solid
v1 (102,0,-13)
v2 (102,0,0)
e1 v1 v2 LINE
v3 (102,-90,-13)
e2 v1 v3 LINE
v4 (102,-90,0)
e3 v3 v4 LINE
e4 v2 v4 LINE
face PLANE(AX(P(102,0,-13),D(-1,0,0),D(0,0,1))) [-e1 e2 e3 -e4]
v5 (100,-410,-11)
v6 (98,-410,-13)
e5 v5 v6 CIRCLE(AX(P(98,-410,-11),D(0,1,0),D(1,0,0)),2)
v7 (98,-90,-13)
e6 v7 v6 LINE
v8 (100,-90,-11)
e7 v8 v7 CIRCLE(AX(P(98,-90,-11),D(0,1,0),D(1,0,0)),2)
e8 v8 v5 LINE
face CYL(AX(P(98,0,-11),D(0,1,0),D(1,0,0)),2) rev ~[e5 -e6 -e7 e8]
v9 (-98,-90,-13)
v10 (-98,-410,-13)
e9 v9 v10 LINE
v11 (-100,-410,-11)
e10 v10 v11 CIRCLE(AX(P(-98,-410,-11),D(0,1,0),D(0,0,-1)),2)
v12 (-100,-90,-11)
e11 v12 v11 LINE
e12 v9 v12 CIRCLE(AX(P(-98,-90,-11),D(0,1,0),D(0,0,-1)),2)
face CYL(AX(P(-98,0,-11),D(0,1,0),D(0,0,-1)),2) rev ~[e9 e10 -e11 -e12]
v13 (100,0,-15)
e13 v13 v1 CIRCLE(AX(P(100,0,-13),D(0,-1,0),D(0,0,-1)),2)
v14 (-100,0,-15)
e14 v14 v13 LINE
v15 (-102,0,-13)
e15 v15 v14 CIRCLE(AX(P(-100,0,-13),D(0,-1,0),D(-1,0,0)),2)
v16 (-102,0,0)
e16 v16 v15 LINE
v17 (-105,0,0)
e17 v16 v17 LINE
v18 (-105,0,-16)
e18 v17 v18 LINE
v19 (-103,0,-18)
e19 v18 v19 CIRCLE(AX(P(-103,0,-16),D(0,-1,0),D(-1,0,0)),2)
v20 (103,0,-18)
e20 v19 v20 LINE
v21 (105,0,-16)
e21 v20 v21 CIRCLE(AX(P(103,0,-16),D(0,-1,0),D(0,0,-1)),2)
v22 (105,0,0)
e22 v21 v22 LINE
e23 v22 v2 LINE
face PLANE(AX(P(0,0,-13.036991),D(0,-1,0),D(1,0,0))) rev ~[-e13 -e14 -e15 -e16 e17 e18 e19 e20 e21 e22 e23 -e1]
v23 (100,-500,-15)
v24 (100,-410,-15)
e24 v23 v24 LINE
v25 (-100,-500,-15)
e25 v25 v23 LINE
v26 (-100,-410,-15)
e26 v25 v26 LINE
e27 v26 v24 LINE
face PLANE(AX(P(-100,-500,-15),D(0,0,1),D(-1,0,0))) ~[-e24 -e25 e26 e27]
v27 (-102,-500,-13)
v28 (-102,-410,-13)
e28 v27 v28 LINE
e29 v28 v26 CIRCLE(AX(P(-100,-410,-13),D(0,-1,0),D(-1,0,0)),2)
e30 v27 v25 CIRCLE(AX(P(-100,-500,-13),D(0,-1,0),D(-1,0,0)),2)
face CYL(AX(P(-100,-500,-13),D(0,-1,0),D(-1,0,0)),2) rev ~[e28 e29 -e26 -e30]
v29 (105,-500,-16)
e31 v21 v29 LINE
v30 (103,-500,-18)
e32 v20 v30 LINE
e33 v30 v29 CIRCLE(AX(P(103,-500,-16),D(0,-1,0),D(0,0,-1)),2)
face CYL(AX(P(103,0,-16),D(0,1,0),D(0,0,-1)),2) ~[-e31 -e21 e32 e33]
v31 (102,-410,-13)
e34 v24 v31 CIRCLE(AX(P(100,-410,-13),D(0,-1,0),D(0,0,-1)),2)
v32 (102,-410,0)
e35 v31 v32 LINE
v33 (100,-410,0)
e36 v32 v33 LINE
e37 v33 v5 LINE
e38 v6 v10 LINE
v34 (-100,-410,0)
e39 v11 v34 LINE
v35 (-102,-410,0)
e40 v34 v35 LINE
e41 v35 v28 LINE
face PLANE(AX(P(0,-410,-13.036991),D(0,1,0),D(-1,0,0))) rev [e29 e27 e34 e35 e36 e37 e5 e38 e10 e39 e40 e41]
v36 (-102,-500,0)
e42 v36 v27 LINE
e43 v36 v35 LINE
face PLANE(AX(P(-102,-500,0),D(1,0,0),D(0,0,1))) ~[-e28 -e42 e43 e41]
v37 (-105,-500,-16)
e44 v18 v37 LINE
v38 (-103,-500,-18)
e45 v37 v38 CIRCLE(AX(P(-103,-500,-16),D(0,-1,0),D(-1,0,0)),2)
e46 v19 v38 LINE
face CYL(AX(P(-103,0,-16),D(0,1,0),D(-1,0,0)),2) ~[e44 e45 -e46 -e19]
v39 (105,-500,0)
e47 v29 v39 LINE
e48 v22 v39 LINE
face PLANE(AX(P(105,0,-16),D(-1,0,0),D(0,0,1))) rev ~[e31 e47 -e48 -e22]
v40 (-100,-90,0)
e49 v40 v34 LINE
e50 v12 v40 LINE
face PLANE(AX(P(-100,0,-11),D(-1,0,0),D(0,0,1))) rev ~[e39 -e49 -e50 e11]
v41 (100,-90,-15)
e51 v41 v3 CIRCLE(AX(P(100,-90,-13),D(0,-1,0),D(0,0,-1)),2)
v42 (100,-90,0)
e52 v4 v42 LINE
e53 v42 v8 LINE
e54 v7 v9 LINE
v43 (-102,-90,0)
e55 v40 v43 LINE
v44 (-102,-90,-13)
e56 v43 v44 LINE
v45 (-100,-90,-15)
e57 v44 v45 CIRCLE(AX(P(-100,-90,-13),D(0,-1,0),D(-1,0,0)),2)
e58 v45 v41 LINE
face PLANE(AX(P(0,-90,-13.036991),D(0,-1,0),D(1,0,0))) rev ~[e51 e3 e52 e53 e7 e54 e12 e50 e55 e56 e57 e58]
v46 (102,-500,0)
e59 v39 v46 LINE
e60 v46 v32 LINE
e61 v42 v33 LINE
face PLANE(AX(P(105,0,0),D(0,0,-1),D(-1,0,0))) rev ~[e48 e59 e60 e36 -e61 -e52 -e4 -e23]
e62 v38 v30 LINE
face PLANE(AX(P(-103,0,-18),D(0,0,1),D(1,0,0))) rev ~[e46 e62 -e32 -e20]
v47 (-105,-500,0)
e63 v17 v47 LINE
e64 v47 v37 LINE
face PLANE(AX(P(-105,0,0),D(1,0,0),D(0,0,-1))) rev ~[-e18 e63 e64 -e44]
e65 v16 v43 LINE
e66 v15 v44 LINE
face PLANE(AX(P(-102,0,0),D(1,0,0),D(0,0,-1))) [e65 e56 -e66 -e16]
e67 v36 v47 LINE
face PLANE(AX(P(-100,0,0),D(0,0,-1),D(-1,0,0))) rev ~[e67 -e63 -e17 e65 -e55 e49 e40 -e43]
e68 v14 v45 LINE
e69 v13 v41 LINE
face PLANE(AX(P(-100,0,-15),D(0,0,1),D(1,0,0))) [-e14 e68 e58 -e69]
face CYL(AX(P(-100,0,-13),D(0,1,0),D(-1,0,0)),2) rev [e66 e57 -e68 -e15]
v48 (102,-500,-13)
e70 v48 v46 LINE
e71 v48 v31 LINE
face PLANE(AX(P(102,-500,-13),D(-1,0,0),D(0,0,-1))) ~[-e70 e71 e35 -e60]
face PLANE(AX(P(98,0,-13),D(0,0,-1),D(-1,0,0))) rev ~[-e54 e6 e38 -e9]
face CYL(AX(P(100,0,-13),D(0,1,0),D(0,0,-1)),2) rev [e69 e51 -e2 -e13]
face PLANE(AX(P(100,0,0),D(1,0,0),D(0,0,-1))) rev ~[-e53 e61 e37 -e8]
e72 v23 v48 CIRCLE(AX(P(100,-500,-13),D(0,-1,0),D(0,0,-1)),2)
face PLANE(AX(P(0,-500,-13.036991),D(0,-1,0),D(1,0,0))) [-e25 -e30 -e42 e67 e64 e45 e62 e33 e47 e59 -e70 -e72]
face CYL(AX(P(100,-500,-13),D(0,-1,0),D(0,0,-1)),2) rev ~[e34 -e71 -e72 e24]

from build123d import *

# Parameters (mm, degrees)
F1_DEPTH = 500
F2_DEPTH = 90


# Not quite as in the source:
# - a pattern or mirror of a feature is missing from the dataset's text; its kind, count and spacing are read off the source's solid


with BuildPart() as f1:
    # F0 (on Front) → F1 (new body)
    with BuildSketch(Plane.XZ):
        with BuildLine():
            Line((102, 0), (100, 0))
            Line((100, 0), (100, -11))
            ThreePointArc((100, -11), (99.4142135624, -12.4142135624), (98, -13))
            Line((98, -13), (0, -13))
            Line((0, -13), (-98, -13))
            ThreePointArc((-98, -13), (-99.4142135624, -12.4142135624), (-100, -11))
            Line((-100, -11), (-100, 0))
            Line((-100, 0), (-102, 0))
            Line((-102, 0), (-102, -13))
            ThreePointArc((-102, -13), (-101.4142135624, -14.4142135624), (-100, -15))
            Line((-100, -15), (100, -15))
            ThreePointArc((100, -15), (101.4142135624, -14.4142135624), (102, -13))
            Line((102, -13), (102, 0))
        make_face()
        with BuildLine():
            Line((105, 0), (102, 0))
            Line((102, 0), (102, -13))
            ThreePointArc((102, -13), (101.4142135624, -14.4142135624), (100, -15))
            Line((100, -15), (-100, -15))
            ThreePointArc((-100, -15), (-101.4142135624, -14.4142135624), (-102, -13))
            Line((-102, -13), (-102, 0))
            Line((-102, 0), (-105, 0))
            Line((-105, 0), (-105, -16))
            ThreePointArc((-105, -16), (-104.4142135624, -17.4142135624), (-103, -18))
            Line((-103, -18), (0, -18))
            Line((0, -18), (103, -18))
            ThreePointArc((103, -18), (104.4142135624, -17.4142135624), (105, -16))
            Line((105, -16), (105, 0))
        make_face()
    extrude(amount=F1_DEPTH)

    # F0 (on Front) → F2 (cut)
    with BuildSketch(Plane.XZ):
        with BuildLine():
            Line((102, 0), (100, 0))
            Line((100, 0), (100, -11))
            ThreePointArc((100, -11), (99.4142135624, -12.4142135624), (98, -13))
            Line((98, -13), (0, -13))
            Line((0, -13), (-98, -13))
            ThreePointArc((-98, -13), (-99.4142135624, -12.4142135624), (-100, -11))
            Line((-100, -11), (-100, 0))
            Line((-100, 0), (-102, 0))
            Line((-102, 0), (-102, -13))
            ThreePointArc((-102, -13), (-101.4142135624, -14.4142135624), (-100, -15))
            Line((-100, -15), (100, -15))
            ThreePointArc((100, -15), (101.4142135624, -14.4142135624), (102, -13))
            Line((102, -13), (102, 0))
        make_face()
    f2 = extrude(amount=F2_DEPTH, mode=Mode.SUBTRACT)

    # F2_copies: F2 across plane
    add(f2.mirror(Plane(origin=(0, -250, 0), x_dir=(0, 0, -1), z_dir=(0, -1, 0))), mode=Mode.SUBTRACT)


solid = f1.part
